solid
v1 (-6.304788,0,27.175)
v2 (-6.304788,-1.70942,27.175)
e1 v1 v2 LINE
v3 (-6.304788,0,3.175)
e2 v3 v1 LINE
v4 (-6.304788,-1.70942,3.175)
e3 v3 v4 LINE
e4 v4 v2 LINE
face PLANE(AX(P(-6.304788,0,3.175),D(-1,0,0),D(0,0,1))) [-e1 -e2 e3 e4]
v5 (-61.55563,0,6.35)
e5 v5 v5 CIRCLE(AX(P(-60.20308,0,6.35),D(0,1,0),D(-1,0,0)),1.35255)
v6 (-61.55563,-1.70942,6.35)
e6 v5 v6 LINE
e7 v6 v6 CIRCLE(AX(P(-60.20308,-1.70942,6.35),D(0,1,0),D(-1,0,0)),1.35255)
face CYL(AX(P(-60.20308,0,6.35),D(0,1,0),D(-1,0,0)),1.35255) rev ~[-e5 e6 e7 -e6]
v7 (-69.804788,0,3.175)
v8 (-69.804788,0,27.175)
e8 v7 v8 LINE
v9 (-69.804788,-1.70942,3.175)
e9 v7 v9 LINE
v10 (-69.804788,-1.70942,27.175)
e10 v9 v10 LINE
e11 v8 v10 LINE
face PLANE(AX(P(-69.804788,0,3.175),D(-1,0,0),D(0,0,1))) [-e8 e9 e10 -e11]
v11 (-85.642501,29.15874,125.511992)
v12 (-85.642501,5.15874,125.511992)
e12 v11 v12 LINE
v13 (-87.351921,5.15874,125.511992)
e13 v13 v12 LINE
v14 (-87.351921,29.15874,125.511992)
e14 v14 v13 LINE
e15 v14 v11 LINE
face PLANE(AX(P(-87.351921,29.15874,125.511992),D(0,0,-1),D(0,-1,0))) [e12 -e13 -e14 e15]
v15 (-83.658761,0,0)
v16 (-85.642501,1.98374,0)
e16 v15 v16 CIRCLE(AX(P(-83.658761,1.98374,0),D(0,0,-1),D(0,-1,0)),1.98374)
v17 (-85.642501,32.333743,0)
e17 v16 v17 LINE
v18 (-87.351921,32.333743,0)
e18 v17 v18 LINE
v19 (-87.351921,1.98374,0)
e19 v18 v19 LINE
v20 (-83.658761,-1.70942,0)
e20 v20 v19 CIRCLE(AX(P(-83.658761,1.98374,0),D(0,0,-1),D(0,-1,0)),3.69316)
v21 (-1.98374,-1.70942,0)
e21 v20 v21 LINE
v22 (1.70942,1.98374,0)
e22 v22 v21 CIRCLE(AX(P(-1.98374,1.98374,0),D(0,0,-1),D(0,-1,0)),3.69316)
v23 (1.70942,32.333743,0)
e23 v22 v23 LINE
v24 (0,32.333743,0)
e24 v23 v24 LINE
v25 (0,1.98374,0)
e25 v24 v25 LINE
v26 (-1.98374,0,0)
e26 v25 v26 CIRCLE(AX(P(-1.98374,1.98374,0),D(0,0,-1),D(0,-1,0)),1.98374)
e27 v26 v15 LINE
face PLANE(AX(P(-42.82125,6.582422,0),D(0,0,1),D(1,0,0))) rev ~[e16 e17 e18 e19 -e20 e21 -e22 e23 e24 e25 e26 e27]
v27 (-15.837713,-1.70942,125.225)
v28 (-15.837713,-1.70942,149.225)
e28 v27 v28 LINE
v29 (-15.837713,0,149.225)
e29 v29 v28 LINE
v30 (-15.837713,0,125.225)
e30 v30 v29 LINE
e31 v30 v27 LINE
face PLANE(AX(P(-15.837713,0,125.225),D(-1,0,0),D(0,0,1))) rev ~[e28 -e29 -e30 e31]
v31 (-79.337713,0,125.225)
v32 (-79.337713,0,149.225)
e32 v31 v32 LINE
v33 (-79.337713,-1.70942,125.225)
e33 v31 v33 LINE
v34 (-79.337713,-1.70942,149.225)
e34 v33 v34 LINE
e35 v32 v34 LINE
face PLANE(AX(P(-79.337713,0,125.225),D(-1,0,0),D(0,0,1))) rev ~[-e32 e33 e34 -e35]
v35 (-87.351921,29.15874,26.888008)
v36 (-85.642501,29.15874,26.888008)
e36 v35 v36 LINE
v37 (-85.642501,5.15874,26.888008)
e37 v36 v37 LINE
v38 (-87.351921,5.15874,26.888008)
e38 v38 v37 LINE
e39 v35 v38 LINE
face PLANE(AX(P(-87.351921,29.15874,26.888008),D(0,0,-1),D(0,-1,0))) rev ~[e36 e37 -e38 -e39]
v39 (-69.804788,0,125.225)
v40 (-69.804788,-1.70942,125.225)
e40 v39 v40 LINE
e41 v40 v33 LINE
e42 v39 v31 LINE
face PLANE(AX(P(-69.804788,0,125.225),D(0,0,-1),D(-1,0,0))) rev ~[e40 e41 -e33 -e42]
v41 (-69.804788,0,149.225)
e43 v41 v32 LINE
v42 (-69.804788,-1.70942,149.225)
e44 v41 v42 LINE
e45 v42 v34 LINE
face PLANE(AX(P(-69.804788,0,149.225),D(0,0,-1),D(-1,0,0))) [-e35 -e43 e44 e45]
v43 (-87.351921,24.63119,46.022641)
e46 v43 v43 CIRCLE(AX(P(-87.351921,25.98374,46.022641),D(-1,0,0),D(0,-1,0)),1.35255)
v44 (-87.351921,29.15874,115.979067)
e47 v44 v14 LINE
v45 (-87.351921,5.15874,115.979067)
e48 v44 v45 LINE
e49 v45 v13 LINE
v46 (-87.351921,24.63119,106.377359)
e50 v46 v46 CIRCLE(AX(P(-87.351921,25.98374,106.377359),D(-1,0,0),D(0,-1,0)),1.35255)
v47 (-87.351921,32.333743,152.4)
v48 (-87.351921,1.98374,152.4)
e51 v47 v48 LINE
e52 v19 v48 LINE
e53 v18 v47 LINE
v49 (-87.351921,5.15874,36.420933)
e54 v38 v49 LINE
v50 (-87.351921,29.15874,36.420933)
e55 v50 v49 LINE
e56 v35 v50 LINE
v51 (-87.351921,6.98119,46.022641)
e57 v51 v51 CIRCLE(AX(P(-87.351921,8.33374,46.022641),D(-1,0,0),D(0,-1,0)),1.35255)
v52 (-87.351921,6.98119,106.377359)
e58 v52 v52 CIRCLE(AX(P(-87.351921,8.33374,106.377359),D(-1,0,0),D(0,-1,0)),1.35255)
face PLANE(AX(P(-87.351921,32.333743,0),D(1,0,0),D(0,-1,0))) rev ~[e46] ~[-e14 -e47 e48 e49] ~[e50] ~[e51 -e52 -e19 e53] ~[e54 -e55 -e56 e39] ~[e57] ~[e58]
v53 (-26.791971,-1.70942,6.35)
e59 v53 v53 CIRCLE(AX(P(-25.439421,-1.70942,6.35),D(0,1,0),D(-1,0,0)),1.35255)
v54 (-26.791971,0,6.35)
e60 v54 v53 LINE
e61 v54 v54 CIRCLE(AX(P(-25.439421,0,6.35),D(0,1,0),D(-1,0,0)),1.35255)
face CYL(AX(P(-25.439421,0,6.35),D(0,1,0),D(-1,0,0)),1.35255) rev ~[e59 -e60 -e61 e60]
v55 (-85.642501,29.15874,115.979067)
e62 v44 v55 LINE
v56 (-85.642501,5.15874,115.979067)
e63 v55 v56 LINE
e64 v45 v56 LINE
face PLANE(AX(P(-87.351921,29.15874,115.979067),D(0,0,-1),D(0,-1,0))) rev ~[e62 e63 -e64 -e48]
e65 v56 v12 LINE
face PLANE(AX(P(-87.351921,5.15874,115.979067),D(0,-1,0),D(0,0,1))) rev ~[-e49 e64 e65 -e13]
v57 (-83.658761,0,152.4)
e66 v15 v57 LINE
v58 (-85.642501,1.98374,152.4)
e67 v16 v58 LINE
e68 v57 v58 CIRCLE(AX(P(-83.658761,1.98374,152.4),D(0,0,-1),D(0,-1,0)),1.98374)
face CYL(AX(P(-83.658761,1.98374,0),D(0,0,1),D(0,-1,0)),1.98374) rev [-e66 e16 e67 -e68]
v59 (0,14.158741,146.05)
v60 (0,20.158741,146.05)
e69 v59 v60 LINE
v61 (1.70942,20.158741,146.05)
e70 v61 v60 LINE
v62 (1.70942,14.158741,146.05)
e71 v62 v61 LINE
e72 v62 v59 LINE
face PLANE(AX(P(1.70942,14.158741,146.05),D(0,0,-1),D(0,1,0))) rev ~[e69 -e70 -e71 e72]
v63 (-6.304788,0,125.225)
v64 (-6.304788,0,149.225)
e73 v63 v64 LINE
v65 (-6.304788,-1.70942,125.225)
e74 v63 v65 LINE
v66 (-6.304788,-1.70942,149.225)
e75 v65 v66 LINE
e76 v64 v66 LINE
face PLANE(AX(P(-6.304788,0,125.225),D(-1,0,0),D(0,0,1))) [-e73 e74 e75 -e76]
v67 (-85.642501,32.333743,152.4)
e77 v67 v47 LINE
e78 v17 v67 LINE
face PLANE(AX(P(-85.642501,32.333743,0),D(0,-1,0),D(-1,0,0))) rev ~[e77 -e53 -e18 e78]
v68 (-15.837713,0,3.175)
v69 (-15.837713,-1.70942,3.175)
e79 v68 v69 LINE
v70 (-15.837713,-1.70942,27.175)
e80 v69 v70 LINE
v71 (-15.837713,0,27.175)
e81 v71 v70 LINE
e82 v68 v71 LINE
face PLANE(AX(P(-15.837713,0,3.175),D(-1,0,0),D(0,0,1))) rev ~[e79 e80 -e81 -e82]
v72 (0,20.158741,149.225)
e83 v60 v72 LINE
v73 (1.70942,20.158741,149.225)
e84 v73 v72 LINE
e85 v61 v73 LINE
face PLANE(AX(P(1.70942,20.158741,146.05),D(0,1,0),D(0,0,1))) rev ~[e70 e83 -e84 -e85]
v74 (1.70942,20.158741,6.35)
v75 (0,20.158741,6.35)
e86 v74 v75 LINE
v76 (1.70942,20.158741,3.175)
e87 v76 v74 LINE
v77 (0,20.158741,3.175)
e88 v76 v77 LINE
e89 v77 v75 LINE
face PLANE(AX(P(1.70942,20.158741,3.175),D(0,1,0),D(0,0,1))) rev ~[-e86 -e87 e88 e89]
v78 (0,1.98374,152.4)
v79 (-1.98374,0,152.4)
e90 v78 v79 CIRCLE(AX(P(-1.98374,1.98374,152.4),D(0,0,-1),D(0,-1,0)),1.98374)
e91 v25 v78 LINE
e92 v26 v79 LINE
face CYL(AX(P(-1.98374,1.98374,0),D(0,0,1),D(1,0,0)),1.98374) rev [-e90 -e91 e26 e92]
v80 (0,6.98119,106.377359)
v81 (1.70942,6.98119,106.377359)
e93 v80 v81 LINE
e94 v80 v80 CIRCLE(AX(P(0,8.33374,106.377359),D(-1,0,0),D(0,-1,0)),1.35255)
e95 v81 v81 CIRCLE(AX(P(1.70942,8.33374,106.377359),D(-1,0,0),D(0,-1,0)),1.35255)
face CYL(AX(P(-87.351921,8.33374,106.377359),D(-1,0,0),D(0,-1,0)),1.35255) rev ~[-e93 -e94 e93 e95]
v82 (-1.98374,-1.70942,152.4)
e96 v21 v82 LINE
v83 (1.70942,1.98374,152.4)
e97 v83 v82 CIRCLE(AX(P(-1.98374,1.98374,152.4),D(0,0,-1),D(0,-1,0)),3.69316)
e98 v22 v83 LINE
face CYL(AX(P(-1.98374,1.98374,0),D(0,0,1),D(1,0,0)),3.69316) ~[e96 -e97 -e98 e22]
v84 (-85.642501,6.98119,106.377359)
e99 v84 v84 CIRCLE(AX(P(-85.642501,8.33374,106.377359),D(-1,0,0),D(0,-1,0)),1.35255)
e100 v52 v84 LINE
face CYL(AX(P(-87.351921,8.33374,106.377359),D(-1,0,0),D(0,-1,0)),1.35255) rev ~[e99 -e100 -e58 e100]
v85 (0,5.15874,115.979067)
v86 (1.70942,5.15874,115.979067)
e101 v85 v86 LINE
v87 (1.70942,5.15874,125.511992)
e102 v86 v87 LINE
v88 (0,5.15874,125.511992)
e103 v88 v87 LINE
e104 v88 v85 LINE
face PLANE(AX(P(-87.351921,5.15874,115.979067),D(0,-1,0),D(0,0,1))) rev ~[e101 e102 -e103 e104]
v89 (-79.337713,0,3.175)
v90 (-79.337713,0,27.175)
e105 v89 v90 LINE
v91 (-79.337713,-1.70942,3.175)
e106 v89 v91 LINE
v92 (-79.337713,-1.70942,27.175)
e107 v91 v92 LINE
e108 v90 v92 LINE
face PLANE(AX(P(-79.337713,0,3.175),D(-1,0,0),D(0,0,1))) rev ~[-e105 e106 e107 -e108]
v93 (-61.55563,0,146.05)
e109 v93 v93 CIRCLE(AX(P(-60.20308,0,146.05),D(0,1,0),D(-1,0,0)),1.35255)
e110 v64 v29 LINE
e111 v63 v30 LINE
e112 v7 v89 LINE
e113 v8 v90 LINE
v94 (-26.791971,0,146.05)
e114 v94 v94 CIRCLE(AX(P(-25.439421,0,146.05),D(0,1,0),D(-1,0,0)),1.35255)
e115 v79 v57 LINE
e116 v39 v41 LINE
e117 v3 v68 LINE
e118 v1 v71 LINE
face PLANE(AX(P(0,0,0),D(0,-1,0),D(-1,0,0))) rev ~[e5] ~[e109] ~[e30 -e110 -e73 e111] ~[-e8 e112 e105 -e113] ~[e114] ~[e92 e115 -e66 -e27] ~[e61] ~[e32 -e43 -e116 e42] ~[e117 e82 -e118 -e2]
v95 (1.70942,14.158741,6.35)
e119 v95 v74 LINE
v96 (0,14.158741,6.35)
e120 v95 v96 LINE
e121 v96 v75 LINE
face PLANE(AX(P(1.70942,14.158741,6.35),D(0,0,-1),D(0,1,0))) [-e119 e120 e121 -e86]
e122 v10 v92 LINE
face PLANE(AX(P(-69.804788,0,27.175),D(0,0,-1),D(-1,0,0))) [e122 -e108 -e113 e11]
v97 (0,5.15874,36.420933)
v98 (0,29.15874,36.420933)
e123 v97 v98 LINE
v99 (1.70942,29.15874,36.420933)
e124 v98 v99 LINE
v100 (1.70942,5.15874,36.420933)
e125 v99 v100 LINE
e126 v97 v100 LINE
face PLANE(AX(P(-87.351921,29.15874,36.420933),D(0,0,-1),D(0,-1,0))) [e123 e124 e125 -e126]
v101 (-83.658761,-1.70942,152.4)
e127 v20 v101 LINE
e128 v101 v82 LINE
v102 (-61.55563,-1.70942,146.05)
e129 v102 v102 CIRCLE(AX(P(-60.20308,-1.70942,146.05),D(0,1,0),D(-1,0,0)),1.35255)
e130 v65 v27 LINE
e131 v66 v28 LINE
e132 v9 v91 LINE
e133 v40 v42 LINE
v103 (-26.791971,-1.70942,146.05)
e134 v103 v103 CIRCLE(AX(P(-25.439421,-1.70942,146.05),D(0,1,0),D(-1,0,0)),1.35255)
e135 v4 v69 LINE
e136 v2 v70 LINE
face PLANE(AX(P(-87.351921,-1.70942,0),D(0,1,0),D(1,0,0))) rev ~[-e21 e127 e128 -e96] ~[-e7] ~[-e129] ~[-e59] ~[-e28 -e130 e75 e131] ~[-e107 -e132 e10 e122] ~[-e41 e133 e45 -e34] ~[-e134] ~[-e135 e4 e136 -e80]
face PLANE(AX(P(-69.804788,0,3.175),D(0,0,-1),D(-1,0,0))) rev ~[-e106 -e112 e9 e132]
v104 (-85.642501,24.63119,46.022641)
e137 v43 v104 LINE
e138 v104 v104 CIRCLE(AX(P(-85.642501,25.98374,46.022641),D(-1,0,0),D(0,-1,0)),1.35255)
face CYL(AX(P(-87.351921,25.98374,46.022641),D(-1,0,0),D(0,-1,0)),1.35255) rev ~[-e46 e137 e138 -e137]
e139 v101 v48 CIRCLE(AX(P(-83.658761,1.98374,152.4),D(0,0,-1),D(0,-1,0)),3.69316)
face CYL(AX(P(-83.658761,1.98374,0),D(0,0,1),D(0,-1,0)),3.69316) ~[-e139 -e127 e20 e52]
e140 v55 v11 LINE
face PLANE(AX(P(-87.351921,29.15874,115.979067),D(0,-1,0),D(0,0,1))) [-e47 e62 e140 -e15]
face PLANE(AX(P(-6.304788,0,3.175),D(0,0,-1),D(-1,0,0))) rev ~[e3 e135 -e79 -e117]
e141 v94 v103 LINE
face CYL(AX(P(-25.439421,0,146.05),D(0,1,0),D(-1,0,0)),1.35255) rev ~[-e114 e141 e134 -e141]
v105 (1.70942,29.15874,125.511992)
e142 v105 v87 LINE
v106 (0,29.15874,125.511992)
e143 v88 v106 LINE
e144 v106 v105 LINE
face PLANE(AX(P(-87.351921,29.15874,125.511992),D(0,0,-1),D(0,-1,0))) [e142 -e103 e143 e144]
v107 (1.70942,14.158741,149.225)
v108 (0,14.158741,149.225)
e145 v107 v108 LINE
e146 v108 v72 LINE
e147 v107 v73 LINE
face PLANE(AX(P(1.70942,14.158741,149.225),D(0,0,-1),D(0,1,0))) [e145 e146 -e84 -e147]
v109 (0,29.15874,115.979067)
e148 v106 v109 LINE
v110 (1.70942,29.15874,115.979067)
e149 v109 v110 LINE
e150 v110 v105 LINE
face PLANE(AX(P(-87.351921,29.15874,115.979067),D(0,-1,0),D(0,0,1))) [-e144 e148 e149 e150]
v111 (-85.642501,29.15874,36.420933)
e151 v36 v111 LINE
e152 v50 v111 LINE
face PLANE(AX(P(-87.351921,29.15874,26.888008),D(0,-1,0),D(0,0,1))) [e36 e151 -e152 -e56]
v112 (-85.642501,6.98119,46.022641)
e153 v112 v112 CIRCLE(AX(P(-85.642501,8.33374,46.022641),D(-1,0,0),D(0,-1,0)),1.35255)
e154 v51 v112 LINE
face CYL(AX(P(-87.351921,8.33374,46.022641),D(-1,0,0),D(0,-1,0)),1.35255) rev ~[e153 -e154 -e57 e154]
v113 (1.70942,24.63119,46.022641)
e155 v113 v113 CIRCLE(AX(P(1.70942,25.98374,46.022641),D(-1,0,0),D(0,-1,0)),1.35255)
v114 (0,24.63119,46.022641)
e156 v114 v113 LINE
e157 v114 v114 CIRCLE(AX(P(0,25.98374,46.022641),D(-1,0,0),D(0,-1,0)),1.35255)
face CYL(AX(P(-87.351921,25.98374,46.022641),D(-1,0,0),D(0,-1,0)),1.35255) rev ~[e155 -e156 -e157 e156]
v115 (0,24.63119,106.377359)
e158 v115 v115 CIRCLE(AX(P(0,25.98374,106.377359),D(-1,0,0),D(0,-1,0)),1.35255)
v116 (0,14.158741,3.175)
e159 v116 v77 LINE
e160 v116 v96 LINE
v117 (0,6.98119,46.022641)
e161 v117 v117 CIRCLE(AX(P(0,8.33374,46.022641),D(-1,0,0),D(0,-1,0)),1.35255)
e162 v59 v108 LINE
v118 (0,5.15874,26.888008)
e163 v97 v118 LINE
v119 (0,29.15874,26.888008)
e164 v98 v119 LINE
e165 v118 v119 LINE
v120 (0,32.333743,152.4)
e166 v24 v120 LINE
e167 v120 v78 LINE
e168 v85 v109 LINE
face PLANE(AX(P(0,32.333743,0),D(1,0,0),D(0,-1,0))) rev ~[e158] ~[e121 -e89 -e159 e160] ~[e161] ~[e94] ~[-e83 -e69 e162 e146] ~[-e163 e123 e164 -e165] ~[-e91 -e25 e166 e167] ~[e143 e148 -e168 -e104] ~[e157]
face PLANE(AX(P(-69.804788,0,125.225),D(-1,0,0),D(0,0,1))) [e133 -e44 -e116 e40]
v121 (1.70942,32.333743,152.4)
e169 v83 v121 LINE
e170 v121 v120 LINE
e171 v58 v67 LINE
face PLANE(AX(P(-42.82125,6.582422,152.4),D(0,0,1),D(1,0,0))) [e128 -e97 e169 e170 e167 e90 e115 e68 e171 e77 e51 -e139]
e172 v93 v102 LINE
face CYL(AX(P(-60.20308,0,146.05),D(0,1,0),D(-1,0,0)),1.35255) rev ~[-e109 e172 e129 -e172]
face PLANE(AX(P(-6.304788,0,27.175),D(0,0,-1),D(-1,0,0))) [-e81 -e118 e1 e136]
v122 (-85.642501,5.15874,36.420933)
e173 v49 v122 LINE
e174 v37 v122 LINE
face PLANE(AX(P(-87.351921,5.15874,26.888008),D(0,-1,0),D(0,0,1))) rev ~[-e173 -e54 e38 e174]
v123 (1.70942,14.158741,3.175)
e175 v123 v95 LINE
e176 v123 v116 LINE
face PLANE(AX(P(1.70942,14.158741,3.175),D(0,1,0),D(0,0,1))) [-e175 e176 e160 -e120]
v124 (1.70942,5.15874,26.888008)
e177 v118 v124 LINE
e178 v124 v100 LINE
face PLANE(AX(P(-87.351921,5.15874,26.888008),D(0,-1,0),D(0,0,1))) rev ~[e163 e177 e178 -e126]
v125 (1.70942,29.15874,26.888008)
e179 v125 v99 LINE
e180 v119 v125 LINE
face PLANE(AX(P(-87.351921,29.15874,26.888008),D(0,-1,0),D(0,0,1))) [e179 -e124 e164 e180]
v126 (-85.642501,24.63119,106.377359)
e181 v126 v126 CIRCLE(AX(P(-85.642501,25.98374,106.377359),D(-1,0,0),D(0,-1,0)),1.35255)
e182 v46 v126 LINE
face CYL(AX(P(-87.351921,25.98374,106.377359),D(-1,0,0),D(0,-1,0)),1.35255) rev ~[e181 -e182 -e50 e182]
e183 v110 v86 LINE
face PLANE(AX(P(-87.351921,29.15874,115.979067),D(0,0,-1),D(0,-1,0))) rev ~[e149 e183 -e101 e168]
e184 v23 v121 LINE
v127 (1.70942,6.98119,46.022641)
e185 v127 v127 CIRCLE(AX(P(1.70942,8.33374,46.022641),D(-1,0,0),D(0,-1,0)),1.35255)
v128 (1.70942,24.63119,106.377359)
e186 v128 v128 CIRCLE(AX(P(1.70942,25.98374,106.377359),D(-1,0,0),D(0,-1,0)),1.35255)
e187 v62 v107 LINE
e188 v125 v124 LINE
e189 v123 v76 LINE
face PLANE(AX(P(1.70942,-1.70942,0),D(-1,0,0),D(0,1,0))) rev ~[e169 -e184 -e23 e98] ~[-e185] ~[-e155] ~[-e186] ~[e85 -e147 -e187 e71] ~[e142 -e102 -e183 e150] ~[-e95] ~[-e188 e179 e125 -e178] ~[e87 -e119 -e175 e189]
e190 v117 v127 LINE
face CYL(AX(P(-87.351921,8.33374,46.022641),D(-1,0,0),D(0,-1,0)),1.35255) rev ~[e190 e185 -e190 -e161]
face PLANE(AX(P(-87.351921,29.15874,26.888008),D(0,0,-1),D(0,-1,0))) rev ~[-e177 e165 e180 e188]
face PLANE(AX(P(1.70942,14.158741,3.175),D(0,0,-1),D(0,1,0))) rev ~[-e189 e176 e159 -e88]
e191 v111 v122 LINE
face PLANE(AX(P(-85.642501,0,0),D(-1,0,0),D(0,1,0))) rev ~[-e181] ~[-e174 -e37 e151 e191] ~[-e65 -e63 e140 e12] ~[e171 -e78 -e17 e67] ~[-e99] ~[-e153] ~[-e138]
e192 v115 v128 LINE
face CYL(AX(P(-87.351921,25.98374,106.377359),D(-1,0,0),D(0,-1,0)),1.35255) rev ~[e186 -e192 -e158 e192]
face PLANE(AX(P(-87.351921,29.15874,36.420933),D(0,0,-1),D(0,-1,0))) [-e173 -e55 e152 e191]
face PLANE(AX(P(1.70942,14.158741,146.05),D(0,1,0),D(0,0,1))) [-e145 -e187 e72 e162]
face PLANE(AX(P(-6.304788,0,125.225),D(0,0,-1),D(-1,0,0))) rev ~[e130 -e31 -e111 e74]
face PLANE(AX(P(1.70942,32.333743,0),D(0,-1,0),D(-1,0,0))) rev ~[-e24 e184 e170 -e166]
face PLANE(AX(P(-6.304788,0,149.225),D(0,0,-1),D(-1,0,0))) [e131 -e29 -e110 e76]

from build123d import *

# Parameters (mm, degrees)
F1_DEPTH = 152.4
F2_R     = 1.98374
F3_R     = 3.69316
F4_W     = 9.5329248
F4_H     = 24
F4_R     = 1.35255
F5_DEPTH = 1.70942
F6_W     = 24
F6_H     = 9.5329248
F6_R     = 1.35255
F7_DEPTH = 89.0613408
F8_W     = 6
F8_H     = 3.175
F9_DEPTH = 1.70942


with BuildPart() as f1:
    # F0 (on Top) → F1 (new body)
    with BuildSketch(Plane.XY):
        Polygon((0, 32.3337428), (0, 0), (-85.6425008, 0), (-85.6425008, 32.3337428), (-87.3519208, 32.3337428), (-87.3519208, -1.70942), (1.70942, -1.70942), (1.70942, 32.3337428), align=None)
    extrude(amount=F1_DEPTH)

    # F2
    f2_edges = [f1.edges().sort_by_distance(p)[0] for p in [
        (0, 0, 76.2),
        (-85.642501, 0, 76.2),
    ]]
    fillet(f2_edges, radius=F2_R)

    # F3
    f3_edges = [f1.edges().sort_by_distance(p)[0] for p in [
        (1.70942, -1.70942, 76.2),
        (-87.351921, -1.70942, 76.2),
    ]]
    fillet(f3_edges, radius=F3_R)

    # F4 (on face) → F5 (cut, through all)
    with BuildSketch(Plane(origin=(0, 0, 0), x_dir=(-1, 0, 0), z_dir=(0, 1, 0))):
        with Locations((74.5712504, 15.175)):
            Rectangle(F4_W, F4_H)
        with Locations((11.0712504, 15.175)):
            Rectangle(F4_W, F4_H)
        with Locations((11.0712504, 137.225)):
            Rectangle(F4_W, F4_H)
        with Locations((74.5712504, 137.225)):
            Rectangle(F4_W, F4_H)
        with Locations((60.20308, 6.35)):
            Circle(F4_R)
        with Locations((25.4394208, 6.35)):
            Circle(F4_R)
        with Locations((25.4394208, 146.05)):
            Circle(F4_R)
        with Locations((60.20308, 146.05)):
            Circle(F4_R)
    extrude(amount=-F5_DEPTH, mode=Mode.SUBTRACT)

    # F6 (on face) → F7 (cut, through all)
    with BuildSketch(Plane(origin=(-87.3519208, 0, 0), x_dir=(0, -1, 0), z_dir=(-1, 0, 0))):
        with Locations((-17.15874, 31.6544706)):
            Rectangle(F6_W, F6_H)
        with Locations((-17.15874, 120.7455294)):
            Rectangle(F6_W, F6_H)
        with Locations((-25.98374, 46.022641)):
            Circle(F6_R)
        with Locations((-25.98374, 106.377359)):
            Circle(F6_R)
        with Locations((-8.33374, 106.377359)):
            Circle(F6_R)
        with Locations((-8.33374, 46.022641)):
            Circle(F6_R)
    extrude(amount=-F7_DEPTH, mode=Mode.SUBTRACT)

    # F8 (on face) → F9 (cut, through all)
    with BuildSketch(Plane.YZ.offset(1.70942)):
        with Locations((17.1587414, 4.7625)):
            Rectangle(F8_W, F8_H)
        with Locations((17.1587414, 147.6375)):
            Rectangle(F8_W, F8_H)
    extrude(amount=-F9_DEPTH, mode=Mode.SUBTRACT)


solid = f1.part
